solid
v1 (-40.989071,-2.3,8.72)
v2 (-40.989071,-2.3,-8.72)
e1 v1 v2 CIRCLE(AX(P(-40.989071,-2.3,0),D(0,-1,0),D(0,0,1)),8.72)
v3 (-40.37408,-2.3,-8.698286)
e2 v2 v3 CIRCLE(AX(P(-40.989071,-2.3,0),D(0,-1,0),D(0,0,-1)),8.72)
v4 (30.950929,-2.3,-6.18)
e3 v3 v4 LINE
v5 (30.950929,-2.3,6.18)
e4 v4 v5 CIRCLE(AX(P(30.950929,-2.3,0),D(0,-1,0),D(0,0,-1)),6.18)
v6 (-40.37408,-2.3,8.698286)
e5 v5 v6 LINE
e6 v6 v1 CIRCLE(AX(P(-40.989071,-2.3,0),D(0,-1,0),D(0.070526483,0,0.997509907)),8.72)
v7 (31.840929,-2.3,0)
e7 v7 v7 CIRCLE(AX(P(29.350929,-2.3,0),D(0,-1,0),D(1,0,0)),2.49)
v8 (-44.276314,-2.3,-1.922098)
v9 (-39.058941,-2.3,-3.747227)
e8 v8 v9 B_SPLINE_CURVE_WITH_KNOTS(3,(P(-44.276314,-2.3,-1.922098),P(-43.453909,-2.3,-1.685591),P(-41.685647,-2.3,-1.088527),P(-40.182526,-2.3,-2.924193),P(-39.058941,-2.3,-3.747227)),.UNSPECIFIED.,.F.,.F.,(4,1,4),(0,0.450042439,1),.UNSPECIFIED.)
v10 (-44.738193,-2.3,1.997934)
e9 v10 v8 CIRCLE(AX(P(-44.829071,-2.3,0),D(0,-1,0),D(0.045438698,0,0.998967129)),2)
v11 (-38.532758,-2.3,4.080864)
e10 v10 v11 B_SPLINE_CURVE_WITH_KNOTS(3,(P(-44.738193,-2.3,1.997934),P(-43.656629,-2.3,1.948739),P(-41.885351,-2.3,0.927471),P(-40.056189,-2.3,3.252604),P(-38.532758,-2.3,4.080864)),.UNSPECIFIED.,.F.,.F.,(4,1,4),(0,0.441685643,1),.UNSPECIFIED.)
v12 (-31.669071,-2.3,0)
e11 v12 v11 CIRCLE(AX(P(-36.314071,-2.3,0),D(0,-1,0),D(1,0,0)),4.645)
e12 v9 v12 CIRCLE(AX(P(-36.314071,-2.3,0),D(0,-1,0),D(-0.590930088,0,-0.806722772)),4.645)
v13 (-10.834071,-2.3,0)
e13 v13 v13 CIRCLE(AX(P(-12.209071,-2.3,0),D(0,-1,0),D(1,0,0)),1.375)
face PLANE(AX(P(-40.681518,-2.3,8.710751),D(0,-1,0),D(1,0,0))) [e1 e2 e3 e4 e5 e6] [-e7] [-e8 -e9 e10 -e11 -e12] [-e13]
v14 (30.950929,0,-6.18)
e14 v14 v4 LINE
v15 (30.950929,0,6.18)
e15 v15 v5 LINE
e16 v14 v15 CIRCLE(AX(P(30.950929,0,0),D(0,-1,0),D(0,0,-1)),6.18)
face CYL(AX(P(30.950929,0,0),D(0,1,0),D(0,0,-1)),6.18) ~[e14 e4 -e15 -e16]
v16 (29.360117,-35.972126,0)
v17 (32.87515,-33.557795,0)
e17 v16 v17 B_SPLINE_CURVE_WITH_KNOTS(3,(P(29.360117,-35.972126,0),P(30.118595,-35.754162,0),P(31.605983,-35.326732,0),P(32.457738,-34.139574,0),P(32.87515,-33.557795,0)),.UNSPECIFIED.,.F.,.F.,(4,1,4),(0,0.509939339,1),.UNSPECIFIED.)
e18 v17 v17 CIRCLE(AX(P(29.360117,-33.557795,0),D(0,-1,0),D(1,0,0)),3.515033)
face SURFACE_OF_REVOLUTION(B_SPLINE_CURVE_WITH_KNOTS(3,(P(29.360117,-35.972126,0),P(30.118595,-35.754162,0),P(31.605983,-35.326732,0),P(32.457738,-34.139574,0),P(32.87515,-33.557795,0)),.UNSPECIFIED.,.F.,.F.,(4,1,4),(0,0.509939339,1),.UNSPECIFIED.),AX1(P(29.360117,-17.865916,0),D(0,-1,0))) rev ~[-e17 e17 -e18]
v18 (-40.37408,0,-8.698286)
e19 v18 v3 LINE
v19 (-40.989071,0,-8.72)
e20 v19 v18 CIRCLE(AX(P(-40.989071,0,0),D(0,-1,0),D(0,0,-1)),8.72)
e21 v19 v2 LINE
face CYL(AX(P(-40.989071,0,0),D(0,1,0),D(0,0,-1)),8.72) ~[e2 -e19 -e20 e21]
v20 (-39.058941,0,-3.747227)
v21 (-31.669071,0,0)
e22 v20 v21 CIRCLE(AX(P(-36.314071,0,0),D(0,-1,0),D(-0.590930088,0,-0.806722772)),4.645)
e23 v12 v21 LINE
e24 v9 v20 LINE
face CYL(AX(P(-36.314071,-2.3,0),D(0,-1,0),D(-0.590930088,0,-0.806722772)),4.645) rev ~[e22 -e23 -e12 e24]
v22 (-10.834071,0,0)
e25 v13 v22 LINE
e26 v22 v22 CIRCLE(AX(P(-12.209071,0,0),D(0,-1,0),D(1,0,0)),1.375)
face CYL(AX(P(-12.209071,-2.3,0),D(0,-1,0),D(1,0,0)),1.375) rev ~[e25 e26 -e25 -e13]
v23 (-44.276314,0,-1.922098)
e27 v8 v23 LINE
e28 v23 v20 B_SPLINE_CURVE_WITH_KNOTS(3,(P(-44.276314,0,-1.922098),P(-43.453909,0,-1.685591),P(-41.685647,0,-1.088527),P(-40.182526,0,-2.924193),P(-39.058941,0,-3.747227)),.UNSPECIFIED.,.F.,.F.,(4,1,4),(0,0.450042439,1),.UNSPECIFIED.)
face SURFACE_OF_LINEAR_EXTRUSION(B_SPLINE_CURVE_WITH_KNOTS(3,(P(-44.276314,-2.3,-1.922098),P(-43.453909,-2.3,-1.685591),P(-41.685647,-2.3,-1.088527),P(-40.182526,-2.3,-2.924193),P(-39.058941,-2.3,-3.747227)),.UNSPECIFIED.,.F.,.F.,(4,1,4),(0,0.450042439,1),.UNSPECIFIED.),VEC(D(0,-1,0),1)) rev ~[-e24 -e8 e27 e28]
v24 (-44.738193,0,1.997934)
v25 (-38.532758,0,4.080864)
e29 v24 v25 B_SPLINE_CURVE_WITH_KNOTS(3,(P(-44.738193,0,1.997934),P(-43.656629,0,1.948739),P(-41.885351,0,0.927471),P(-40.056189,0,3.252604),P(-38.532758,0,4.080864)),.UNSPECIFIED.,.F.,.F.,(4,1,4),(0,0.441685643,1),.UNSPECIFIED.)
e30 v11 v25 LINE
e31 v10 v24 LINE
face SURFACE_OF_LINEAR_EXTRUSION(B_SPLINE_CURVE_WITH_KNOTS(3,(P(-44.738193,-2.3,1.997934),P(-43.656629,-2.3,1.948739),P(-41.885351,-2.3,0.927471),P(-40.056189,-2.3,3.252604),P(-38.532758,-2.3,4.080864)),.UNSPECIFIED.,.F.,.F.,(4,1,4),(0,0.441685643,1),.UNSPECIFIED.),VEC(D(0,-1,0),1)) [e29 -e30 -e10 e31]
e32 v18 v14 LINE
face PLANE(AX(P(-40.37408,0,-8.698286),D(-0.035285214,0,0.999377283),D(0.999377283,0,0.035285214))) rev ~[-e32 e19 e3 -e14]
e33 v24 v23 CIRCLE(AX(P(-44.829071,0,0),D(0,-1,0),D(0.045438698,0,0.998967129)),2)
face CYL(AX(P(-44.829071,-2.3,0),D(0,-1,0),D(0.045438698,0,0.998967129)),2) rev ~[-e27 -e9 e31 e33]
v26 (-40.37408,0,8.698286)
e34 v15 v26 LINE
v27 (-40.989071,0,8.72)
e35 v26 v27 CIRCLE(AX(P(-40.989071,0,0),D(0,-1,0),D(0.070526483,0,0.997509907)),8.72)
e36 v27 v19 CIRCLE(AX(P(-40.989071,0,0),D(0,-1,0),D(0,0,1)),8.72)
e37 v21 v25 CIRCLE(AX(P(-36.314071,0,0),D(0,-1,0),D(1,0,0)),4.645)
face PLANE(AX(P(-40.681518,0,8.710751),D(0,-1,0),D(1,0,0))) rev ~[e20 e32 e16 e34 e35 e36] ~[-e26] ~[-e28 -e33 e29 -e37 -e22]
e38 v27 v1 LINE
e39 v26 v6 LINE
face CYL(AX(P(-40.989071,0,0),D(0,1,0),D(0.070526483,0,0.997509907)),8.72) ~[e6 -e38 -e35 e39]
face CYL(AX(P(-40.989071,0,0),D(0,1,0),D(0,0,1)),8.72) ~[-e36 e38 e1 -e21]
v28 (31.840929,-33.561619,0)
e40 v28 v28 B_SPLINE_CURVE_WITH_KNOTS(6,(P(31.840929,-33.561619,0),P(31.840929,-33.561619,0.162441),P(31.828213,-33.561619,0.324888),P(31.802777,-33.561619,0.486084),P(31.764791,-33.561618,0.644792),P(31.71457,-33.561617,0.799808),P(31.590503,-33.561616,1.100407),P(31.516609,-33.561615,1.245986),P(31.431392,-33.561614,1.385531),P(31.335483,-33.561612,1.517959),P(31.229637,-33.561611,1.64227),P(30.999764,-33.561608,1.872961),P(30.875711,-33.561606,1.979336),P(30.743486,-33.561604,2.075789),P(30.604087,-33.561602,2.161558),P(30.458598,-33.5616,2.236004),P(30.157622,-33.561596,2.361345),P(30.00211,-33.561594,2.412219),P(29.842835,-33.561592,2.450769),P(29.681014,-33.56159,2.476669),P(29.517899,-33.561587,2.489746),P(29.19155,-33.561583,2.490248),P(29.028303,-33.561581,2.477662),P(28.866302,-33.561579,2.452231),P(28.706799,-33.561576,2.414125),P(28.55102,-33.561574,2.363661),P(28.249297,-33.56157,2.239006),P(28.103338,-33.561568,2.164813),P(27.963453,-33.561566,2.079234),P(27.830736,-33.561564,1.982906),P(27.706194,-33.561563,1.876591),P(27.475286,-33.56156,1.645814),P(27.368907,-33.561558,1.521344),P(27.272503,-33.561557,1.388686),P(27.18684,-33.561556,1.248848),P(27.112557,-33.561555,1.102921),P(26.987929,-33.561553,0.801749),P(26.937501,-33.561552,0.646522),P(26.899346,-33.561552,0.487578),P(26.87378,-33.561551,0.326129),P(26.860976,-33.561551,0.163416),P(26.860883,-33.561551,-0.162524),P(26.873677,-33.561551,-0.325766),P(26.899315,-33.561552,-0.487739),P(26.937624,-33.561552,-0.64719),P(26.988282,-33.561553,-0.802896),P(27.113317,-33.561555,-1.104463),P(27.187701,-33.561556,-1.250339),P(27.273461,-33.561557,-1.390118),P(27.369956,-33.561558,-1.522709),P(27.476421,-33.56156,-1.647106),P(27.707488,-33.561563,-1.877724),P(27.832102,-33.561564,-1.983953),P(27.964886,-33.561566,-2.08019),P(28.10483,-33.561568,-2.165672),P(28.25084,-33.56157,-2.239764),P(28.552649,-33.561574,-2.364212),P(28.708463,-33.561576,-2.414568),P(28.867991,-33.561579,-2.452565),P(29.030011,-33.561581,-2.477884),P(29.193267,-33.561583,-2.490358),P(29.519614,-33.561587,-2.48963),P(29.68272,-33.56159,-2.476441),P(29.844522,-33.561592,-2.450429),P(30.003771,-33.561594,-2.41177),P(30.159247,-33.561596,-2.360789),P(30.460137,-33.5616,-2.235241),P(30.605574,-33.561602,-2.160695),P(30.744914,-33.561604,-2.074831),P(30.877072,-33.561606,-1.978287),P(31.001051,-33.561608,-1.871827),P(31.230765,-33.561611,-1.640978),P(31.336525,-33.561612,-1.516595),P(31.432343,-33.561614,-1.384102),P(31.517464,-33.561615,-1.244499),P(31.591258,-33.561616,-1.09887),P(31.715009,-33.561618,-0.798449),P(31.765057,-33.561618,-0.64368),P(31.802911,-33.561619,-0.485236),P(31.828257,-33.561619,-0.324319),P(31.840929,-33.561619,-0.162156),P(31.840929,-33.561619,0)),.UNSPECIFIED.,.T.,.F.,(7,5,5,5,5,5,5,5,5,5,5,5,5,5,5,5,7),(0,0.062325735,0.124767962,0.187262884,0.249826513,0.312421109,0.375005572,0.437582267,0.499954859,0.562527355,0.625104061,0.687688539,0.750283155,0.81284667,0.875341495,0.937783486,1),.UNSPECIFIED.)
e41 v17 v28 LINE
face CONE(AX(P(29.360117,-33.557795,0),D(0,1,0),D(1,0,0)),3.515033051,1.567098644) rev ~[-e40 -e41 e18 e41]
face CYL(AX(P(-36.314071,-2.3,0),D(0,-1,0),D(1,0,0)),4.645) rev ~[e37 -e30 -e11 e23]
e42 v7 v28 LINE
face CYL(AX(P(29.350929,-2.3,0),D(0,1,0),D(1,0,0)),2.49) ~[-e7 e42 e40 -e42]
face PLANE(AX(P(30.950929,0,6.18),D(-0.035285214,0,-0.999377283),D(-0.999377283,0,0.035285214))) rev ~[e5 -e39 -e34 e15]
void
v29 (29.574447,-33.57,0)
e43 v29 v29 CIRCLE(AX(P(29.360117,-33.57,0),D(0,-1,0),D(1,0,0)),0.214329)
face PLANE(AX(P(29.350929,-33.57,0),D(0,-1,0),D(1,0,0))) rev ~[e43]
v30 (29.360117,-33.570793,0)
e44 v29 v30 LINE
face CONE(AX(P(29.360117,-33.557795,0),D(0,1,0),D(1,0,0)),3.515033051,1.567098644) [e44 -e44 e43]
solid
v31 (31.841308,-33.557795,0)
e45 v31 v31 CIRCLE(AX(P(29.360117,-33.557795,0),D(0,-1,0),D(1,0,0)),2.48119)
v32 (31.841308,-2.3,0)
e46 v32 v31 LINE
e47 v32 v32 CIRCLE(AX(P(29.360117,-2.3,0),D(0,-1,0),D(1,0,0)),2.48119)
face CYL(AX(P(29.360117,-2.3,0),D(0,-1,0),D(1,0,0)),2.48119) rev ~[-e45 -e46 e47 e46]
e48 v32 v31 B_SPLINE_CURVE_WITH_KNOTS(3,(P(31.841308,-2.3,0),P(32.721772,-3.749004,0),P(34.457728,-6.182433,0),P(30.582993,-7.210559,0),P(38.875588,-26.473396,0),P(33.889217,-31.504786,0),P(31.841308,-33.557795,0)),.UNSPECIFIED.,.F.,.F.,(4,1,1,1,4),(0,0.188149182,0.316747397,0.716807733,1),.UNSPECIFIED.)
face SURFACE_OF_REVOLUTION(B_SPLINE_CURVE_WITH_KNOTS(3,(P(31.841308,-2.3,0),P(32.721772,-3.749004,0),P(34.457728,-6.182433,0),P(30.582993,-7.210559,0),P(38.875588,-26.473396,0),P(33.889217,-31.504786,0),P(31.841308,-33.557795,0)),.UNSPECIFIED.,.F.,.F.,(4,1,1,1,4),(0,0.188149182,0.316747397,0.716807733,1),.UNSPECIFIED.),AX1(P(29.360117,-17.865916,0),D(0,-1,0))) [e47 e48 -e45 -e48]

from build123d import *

# Parameters (mm, degrees)
F1_DEPTH = 2.3
F2_R     = 1.375
F3_DEPTH = 2.3
F2_R_2   = 2.49
F4_DEPTH = 31.27


# Not quite as in the source:
# - a feature names something its author has since deleted; it is built from what else it names


with BuildPart() as f1:
    # F0 (on Front) → F1 (new body)
    with BuildSketch(Plane.XZ):
        with BuildLine():
            Line((-40.9890707389, 8.72), (-40.3740798098, 8.698286392))
            ThreePointArc((-40.3740798098, 8.698286392), (-40.6813836724, 8.7145699073), (-40.9890707389, 8.72))
        make_face()
        with BuildLine():
            Line((30.9509292611, 6.18), (-40.3740798098, 8.698286392))
            Line((-40.3740798098, 8.698286392), (-40.9890707389, 8.72))
            ThreePointArc((-40.9890707389, 8.72), (-49.7090707389, 0), (-40.9890707389, -8.72))
            Line((-40.9890707389, -8.72), (-40.3740798098, -8.698286392))
            Line((-40.3740798098, -8.698286392), (30.9509292611, -6.18))
            ThreePointArc((30.9509292611, -6.18), (37.1309292611, 0), (30.9509292611, 6.18))
        make_face()
        with BuildLine():
            Line((-40.3740798098, -8.698286392), (-40.9890707389, -8.72))
            ThreePointArc((-40.9890707389, -8.72), (-40.6813836724, -8.7145699073), (-40.3740798098, -8.698286392))
        make_face()
    extrude(amount=F1_DEPTH)

    # F2 (on face) → F3 (cut, through all)
    with BuildSketch(Plane.XZ.offset(2.3)):
        with BuildLine():
            ThreePointArc((-31.6690707389, 0), (-33.9402317237, 3.9926073348), (-38.5327578563, 4.0808641824))
            ThreePointArc((-38.5327578563, 4.0808641824), (-40.9486127259, 0.3115213811), (-39.0589409979, -3.7472272764))
            ThreePointArc((-39.0589409979, -3.7472272764), (-34.2133443589, -4.142821946), (-31.6690707389, 0))
        make_face()
        with BuildLine():
            ThreePointArc((-44.2763140533, -1.9220978244), (-43.231335878, -1.2030142619), (-42.8290707389, 0))
            ThreePointArc((-42.8290707389, 0), (-43.3830840877, 1.3817100291), (-44.7381933434, 1.9979342579))
            ThreePointArc((-44.7381933434, 1.9979342579), (-46.8153308148, -0.2340318586), (-44.2763140533, -1.9220978244))
        make_face()
        with BuildLine():
            ThreePointArc((-44.7381933434, 1.9979342579), (-43.3830840877, 1.3817100291), (-42.8290707389, 0))
            ThreePointArc((-42.8290707389, 0), (-43.231335878, -1.2030142619), (-44.2763140533, -1.9220978244))
            add(Edge.make_bspline(
                [(-44.2763140533, -1.9220978244), (-43.4539093283, -1.685590762), (-41.685646855, -1.0885271587), (-40.1825261621, -2.924193264), (-39.0589409979, -3.7472272764)],
                knots=[0, 0, 0, 0, 0.4500424394, 1, 1, 1, 1], degree=3))
            ThreePointArc((-39.0589409979, -3.7472272764), (-40.9486127259, 0.3115213811), (-38.5327578563, 4.0808641824))
            add(Edge.make_bspline(
                [(-44.7381933434, 1.9979342579), (-43.6566289581, 1.9487385679), (-41.8853510694, 0.927471279), (-40.0561887145, 3.2526042187), (-38.5327578563, 4.0808641824)],
                knots=[0, 0, 0, 0, 0.4416856432, 1, 1, 1, 1], degree=3))
        make_face()
        with Locations((-12.2090707389, 0)):
            Circle(F2_R)
    extrude(amount=-F3_DEPTH, mode=Mode.SUBTRACT)

    # F2 (on face) → F4 (join)
    with BuildSketch(Plane.XZ.offset(2.3)):
        with Locations((29.3509292611, 0)):
            Circle(F2_R_2)
    extrude(amount=F4_DEPTH)

    # F5 (on Top) → F7 (revolve)
    with BuildSketch(Plane.XY):
        with BuildLine():
            add(Edge.make_bspline(
                [(29.3601173908, -35.9721258283), (30.1185949648, -35.7541623267), (31.6059828087, -35.326732072), (32.45773849, -34.1395743071), (32.8751504421, -33.5577949882)],
                knots=[0, 0, 0, 0, 0.509939339, 1, 1, 1, 1], degree=3))
            Line((32.8751504421, -33.5577949882), (29.3601173908, -33.570792526))
            Line((29.3601173908, -33.570792526), (29.3601173908, -35.9721258283))
        make_face()
    revolve(axis=Axis((29.3601173908, -17.865916132, 0), (0, -1, 0)))


with BuildPart() as f6:
    # F5 (on Top) → F6 (revolve)
    with BuildSketch(Plane.XY):
        with BuildLine():
            add(Edge.make_bspline(
                [(31.8413078785, -2.3), (32.7217720858, -3.7490035606), (34.4577278681, -6.1824333871), (30.5829934083, -7.2105587452), (38.8755879035, -26.4733960087), (33.8892173922, -31.5047864924), (31.8413078785, -33.5577949882)],
                knots=[0, 0, 0, 0, 0.1881491817, 0.3167473972, 0.7168077329, 1, 1, 1, 1], degree=3))
            Line((31.8413078785, -2.3), (31.8413078785, -33.5577949882))
        make_face()
    revolve(axis=Axis((29.3601173908, -17.865916132, 0), (0, -1, 0)))


solid = Compound([f1.part, f6.part])
